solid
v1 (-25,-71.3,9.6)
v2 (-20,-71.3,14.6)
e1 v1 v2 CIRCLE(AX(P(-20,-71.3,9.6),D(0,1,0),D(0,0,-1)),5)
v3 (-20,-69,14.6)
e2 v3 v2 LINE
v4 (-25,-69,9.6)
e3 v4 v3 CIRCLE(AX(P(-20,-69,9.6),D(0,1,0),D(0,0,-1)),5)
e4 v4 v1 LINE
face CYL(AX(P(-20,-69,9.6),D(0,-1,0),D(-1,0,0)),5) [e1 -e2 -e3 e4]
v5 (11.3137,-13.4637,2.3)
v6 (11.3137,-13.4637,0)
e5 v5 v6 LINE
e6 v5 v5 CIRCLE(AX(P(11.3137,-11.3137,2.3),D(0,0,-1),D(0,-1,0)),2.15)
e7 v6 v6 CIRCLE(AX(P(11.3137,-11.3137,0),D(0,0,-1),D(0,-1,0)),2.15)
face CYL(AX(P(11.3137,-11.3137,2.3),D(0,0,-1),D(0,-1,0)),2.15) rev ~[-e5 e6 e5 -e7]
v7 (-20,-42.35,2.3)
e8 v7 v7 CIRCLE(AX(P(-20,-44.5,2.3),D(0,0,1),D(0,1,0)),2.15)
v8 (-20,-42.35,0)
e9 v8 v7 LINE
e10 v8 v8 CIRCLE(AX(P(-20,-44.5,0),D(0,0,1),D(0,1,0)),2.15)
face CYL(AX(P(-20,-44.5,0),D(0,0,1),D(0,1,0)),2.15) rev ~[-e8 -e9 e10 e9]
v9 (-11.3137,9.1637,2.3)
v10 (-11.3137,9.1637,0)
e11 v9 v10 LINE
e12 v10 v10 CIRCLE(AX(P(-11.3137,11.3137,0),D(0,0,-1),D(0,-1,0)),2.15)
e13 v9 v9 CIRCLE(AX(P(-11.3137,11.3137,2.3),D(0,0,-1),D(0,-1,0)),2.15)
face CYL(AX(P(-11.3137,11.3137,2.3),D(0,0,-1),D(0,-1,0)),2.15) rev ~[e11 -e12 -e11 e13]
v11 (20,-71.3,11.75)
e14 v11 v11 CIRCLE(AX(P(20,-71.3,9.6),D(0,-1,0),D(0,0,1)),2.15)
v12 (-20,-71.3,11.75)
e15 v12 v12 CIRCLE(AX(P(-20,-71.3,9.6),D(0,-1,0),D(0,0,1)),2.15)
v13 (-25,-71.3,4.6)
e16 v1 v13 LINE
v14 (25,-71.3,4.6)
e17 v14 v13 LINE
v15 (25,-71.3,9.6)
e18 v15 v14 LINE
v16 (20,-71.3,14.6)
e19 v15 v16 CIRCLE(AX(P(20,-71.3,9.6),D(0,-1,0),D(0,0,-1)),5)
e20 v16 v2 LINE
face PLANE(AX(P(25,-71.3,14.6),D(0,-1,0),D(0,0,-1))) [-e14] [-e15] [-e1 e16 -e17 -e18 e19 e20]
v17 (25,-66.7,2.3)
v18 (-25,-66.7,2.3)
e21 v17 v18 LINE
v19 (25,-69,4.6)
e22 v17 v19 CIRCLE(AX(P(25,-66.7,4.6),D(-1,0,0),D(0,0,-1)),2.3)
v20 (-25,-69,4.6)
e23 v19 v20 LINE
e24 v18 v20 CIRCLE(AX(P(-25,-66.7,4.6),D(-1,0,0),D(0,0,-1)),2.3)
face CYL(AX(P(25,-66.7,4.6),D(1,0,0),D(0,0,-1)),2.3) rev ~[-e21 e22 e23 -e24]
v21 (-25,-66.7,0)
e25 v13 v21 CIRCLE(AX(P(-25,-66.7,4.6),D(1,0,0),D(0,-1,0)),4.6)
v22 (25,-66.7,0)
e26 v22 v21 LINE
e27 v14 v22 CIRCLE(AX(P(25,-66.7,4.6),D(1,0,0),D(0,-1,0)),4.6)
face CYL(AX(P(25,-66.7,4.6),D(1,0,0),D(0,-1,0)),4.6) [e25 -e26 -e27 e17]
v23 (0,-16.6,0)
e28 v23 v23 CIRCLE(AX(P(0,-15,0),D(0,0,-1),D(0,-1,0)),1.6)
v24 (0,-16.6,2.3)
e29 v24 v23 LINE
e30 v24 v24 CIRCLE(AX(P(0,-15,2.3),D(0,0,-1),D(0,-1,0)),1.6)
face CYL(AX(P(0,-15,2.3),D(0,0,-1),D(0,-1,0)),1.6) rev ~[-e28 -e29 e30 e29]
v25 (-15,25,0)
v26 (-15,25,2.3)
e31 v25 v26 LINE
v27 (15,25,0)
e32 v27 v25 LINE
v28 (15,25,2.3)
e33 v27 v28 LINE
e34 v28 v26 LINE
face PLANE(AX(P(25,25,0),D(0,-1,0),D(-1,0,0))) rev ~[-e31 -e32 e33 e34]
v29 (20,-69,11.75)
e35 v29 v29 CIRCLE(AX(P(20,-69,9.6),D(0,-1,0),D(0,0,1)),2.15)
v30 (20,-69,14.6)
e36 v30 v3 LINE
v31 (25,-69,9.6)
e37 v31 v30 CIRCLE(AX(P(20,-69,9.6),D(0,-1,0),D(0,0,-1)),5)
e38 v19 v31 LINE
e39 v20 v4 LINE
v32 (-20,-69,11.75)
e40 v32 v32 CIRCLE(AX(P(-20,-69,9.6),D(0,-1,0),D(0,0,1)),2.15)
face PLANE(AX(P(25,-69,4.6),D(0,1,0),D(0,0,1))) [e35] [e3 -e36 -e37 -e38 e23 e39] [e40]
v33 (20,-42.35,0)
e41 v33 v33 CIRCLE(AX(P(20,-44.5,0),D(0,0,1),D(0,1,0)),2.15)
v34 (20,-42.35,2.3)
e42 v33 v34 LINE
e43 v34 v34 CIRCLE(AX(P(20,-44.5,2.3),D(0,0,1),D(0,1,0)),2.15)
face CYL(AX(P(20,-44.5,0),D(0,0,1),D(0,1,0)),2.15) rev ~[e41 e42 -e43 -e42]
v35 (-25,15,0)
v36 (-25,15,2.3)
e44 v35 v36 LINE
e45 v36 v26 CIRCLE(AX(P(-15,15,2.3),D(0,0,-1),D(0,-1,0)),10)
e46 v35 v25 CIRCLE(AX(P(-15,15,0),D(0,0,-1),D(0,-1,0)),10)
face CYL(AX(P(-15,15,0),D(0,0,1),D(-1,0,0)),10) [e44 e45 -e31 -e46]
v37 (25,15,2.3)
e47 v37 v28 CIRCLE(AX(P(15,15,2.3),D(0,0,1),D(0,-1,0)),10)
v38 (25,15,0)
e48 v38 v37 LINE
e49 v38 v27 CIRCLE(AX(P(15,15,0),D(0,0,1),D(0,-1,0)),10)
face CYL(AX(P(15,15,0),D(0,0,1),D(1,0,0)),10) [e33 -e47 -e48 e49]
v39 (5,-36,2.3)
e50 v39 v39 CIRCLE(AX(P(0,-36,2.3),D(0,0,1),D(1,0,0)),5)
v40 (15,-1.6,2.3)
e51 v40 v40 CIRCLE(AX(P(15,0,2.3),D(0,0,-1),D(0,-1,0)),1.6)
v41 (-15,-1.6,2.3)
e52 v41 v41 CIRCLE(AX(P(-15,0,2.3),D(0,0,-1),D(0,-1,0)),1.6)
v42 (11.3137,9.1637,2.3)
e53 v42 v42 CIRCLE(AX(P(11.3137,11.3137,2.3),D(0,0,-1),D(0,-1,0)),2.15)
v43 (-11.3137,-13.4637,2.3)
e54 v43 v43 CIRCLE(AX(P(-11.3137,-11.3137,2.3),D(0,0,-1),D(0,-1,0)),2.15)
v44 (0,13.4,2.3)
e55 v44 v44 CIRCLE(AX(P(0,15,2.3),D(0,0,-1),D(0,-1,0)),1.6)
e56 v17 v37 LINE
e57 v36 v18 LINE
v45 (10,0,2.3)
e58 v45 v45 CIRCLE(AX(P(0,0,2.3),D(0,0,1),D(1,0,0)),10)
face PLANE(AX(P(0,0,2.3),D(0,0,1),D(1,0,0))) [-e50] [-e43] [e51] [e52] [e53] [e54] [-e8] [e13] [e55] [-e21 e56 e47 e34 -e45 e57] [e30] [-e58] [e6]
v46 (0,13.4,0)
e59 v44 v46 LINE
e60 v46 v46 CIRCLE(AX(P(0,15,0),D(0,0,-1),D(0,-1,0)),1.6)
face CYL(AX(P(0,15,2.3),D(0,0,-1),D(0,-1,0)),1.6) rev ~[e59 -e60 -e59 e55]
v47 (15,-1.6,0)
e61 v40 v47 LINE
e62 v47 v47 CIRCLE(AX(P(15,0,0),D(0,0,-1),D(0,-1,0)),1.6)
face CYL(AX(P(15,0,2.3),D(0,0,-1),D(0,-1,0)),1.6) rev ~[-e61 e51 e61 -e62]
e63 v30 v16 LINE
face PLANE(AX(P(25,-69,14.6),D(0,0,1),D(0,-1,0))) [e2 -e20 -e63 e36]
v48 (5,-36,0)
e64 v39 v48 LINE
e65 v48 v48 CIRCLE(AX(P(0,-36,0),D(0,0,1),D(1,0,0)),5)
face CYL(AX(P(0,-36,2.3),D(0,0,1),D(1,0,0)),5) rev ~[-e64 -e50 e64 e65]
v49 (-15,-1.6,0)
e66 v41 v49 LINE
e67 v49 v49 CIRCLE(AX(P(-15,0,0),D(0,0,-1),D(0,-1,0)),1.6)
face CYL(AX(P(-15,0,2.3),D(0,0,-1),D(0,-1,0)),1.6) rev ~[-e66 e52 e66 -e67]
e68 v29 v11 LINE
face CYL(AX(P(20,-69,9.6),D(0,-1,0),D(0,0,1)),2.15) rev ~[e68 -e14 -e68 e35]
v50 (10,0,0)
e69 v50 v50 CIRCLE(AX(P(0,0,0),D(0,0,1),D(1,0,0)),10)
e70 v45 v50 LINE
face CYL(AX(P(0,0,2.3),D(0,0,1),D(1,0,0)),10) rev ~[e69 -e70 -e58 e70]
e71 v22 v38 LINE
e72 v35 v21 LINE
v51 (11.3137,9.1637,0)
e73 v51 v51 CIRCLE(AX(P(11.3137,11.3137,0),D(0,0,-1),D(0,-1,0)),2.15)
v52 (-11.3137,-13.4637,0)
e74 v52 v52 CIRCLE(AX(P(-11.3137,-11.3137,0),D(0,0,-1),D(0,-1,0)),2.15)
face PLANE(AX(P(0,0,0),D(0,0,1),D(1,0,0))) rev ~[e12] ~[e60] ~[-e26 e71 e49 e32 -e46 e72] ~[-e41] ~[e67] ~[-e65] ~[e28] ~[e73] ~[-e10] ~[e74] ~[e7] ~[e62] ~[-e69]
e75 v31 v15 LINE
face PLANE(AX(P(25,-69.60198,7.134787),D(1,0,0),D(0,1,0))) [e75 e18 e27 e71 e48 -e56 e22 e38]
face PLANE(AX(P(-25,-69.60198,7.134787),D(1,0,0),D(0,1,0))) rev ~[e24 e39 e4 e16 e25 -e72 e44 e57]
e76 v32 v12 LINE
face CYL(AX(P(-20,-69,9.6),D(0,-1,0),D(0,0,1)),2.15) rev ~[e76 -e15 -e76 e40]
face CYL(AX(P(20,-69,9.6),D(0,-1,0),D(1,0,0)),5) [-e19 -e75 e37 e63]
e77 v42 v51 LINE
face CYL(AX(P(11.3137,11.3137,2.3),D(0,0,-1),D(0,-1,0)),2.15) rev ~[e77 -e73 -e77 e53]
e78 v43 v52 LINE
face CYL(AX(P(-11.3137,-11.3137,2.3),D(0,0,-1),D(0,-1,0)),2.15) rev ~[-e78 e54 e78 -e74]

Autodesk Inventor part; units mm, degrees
ref_plane "YZ Plane" through (0, 0, 0) normal (1, 0, 0) x (0, 1, 0)
ref_plane "XZ Plane" through (0, 0, 0) normal (0, 1, 0) x (-1, 0, 0)
ref_plane "XY Plane" through (0, 0, 0) normal (0, 0, 1) x (1, 0, 0)
sketch "スケッチ1" plane through (0, 0, 0) normal (0, 0, 1) x (1, 0, 0)
  line L0 (-25, -71.3) -> (25, -71.3)
  line L1 (25, -71.3) -> (25, 25)
  line L2 (25, 25) -> (-25, 25)
  line L3 (-25, 25) -> (-25, -71.3)
  line L4 (-25, -71.3) -> (25, 25) construction
  line L5 (25, -71.3) -> (-25, 25) construction
  circle A0 centre (0, 0) radius 19 construction
  point P0 (0, -23.15)
  point P1 (0, -23.15)
  dimension "d0" = 38
  dimension "d1" = 50
  dimension "d2" = 25
  dimension "d3" = 71.3
extrude "プレート1" add sketch "スケッチ1" along normal blind 2.3
sketch "スケッチ9" plane through (25, -69, 0) normal (0, -1, 0) x (1, 0, 0)
  line L0 (-50, 0) -> (0, 0)
  line L1 (0, 0) -> (0, 14.6)
  line L2 (0, 14.6) -> (-50, 14.6)
  line L3 (-50, 14.6) -> (-50, 0)
edge flange "フランジ3" height 14.6 angle 90 thickness 2.3 bend radius 2.3 thickness toward (0, -1, 0) relief tear relief width 2.3 relief depth 1.15 edges at (0, -71.3, 2.3) wall of the first edge with corners at (-25, -69, 0) (25, -69, 0) (25, -69, 14.6) (-25, -69, 14.6)
bend "曲げ3"
corner "コーナー3"
fillet "コーナーR1" radius 5 2 edges at (25, -70.15, 14.6) (-25, -70.15, 14.6)
sketch "スケッチ4" plane through (0, 0, 2.3) normal (0, 0, 1) x (1, 0, 0)
  circle A0 centre (0, 0) radius 15
  point P0 (0, 15)
  point P1 (-15, 0)
  point P2 (0, -15)
  point P3 (15, 0)
  dimension "d26" = 30
  dimension "d29" = 360
hole "穴1" at (0, 15, 2.3) at (-15, 0, 2.3) at (0, -15, 2.3) at (15, 0, 2.3) direction (0, 0, -1) diameter 3.2 end through all clearance for "Flat Head Machine Screw" size "M3" standard "Ansi Metric M Profile"
sketch "スケッチ5" plane through (0, 0, 2.3) normal (0, 0, 1) x (1, 0, 0)
  circle A0 centre (0, 0) radius 16
  point P0 (-11.3137, 11.3137)
  point P1 (-11.3137, -11.3137)
  point P2 (11.3137, -11.3137)
  point P3 (11.3137, 11.3137)
  dimension "d38" = 32
  dimension "d41" = 360
hole "穴2" at (-11.3137, 11.3137, 2.3) at (-11.3137, -11.3137, 2.3) at (11.3137, -11.3137, 2.3) at (11.3137, 11.3137, 2.3) direction (0, 0, -1) diameter 4.3 end through all clearance for "Flat Head Machine Screw" size "M4" standard "Ansi Metric M Profile"
sketch "スケッチ6" plane through (0, 0, 2.3) normal (0, 0, 1) x (1, 0, 0)
  circle A0 centre (0, 0) radius 10
  dimension "d50" = 20
extrude "押し出し1" cut sketch "スケッチ6" against normal blind 10
sketch "スケッチ7" plane through (-25, -69, -2.3) normal (0, 1, 0) x (1, 0, 0)
  line L0 (5, -16.9) -> (45, -16.9) projected
  line L1 (0, -6.9) -> (0, -11.9) projected
  line L2 (50, -6.9) -> (50, -11.9) projected
  point P0 (18, -2.3)
  point P1 (45, -11.9)
  point P2 (5, -11.9)
  dimension "d76" = 5
  dimension "d77" = 5
  dimension "d78" = 5
hole "穴3" at (20, -69, 9.6) at (-20, -69, 9.6) direction (0, -1, 0) diameter 4.3 end through all clearance for "Flat Head Machine Screw" size "M4" standard "Ansi Metric M Profile"
fillet "コーナーR3" radius 10 2 edges at (-25, 25, 1.15) (25, 25, 1.15)
sketch "スケッチ10" plane through (0, 0, 0) normal (0, 0, -1) x (-1, 0, 0)
  line L0 (-25, -66.7) -> (-25, 15) projected
  line L1 (25, 15) -> (25, -66.7) projected
  circle A0 centre (-20, -44.5) radius 4
  circle A1 centre (0, 0) radius 45
  point P0 (20, -44.5)
  dimension "d80" = 5
  dimension "d81" = 5
  dimension "d82" = 44.5
  dimension "d83" = 8
  dimension "d84" = 90
hole "穴4" at (20, -44.5, 0) at (-20, -44.5, 0) direction (0, 0, 1) diameter 4.3 end through all clearance for "Flat Head Machine Screw" size "M4" standard "Ansi Metric M Profile"
sketch "スケッチ11" plane through (0, 0, 2.3) normal (0, 0, 1) x (1, 0, 0)
  circle A0 centre (0, -36) radius 5
  point P0 (0, 0)
  dimension "d92" = 10
  dimension "d93" = 36
extrude "押し出し3" cut sketch "スケッチ11" against normal blind 10
equation "\"d36\" = Thickness"
equation "\"d48\" = Thickness"
equation "\"d77\" = d76"
equation "\"d61\" = Thickness"
equation "\"d90\" = Thickness"
equation "\"d4\" = Thickness"
equation "\"d66\" = BendReliefWidth"
equation "\"d67\" = BendReliefDepth"
equation "\"d68\" = MinimumRemnant"
equation "\"d69\" = TransitionRadius"
equation "\"d72\" = BendRadius"
equation "\"d73\" = CornerReliefSize"
equation "\"d74\" = GapSize"
equation "\"d75\" = JacobiRadiusSize"
equation "\"d2\" = 0.5 * d1"
equation "\"BendRadius\" = Thickness"
equation "\"BendReliefWidth\" = Thickness"
equation "\"BendReliefDepth\" = 0.5 * Thickness"
equation "\"CornerReliefSize\" = 4 * Thickness"
equation "\"MinimumRemnant\" = 2 * Thickness"
equation "\"TransitionRadius\" = BendRadius"
equation "\"JacobiRadiusSize\" = BendRadius"
equation "\"GapSize\" = Thickness"
equation "\"Thickness\" = 2.3"
properties part number "plate8" material "鋼、炭素鋼"
